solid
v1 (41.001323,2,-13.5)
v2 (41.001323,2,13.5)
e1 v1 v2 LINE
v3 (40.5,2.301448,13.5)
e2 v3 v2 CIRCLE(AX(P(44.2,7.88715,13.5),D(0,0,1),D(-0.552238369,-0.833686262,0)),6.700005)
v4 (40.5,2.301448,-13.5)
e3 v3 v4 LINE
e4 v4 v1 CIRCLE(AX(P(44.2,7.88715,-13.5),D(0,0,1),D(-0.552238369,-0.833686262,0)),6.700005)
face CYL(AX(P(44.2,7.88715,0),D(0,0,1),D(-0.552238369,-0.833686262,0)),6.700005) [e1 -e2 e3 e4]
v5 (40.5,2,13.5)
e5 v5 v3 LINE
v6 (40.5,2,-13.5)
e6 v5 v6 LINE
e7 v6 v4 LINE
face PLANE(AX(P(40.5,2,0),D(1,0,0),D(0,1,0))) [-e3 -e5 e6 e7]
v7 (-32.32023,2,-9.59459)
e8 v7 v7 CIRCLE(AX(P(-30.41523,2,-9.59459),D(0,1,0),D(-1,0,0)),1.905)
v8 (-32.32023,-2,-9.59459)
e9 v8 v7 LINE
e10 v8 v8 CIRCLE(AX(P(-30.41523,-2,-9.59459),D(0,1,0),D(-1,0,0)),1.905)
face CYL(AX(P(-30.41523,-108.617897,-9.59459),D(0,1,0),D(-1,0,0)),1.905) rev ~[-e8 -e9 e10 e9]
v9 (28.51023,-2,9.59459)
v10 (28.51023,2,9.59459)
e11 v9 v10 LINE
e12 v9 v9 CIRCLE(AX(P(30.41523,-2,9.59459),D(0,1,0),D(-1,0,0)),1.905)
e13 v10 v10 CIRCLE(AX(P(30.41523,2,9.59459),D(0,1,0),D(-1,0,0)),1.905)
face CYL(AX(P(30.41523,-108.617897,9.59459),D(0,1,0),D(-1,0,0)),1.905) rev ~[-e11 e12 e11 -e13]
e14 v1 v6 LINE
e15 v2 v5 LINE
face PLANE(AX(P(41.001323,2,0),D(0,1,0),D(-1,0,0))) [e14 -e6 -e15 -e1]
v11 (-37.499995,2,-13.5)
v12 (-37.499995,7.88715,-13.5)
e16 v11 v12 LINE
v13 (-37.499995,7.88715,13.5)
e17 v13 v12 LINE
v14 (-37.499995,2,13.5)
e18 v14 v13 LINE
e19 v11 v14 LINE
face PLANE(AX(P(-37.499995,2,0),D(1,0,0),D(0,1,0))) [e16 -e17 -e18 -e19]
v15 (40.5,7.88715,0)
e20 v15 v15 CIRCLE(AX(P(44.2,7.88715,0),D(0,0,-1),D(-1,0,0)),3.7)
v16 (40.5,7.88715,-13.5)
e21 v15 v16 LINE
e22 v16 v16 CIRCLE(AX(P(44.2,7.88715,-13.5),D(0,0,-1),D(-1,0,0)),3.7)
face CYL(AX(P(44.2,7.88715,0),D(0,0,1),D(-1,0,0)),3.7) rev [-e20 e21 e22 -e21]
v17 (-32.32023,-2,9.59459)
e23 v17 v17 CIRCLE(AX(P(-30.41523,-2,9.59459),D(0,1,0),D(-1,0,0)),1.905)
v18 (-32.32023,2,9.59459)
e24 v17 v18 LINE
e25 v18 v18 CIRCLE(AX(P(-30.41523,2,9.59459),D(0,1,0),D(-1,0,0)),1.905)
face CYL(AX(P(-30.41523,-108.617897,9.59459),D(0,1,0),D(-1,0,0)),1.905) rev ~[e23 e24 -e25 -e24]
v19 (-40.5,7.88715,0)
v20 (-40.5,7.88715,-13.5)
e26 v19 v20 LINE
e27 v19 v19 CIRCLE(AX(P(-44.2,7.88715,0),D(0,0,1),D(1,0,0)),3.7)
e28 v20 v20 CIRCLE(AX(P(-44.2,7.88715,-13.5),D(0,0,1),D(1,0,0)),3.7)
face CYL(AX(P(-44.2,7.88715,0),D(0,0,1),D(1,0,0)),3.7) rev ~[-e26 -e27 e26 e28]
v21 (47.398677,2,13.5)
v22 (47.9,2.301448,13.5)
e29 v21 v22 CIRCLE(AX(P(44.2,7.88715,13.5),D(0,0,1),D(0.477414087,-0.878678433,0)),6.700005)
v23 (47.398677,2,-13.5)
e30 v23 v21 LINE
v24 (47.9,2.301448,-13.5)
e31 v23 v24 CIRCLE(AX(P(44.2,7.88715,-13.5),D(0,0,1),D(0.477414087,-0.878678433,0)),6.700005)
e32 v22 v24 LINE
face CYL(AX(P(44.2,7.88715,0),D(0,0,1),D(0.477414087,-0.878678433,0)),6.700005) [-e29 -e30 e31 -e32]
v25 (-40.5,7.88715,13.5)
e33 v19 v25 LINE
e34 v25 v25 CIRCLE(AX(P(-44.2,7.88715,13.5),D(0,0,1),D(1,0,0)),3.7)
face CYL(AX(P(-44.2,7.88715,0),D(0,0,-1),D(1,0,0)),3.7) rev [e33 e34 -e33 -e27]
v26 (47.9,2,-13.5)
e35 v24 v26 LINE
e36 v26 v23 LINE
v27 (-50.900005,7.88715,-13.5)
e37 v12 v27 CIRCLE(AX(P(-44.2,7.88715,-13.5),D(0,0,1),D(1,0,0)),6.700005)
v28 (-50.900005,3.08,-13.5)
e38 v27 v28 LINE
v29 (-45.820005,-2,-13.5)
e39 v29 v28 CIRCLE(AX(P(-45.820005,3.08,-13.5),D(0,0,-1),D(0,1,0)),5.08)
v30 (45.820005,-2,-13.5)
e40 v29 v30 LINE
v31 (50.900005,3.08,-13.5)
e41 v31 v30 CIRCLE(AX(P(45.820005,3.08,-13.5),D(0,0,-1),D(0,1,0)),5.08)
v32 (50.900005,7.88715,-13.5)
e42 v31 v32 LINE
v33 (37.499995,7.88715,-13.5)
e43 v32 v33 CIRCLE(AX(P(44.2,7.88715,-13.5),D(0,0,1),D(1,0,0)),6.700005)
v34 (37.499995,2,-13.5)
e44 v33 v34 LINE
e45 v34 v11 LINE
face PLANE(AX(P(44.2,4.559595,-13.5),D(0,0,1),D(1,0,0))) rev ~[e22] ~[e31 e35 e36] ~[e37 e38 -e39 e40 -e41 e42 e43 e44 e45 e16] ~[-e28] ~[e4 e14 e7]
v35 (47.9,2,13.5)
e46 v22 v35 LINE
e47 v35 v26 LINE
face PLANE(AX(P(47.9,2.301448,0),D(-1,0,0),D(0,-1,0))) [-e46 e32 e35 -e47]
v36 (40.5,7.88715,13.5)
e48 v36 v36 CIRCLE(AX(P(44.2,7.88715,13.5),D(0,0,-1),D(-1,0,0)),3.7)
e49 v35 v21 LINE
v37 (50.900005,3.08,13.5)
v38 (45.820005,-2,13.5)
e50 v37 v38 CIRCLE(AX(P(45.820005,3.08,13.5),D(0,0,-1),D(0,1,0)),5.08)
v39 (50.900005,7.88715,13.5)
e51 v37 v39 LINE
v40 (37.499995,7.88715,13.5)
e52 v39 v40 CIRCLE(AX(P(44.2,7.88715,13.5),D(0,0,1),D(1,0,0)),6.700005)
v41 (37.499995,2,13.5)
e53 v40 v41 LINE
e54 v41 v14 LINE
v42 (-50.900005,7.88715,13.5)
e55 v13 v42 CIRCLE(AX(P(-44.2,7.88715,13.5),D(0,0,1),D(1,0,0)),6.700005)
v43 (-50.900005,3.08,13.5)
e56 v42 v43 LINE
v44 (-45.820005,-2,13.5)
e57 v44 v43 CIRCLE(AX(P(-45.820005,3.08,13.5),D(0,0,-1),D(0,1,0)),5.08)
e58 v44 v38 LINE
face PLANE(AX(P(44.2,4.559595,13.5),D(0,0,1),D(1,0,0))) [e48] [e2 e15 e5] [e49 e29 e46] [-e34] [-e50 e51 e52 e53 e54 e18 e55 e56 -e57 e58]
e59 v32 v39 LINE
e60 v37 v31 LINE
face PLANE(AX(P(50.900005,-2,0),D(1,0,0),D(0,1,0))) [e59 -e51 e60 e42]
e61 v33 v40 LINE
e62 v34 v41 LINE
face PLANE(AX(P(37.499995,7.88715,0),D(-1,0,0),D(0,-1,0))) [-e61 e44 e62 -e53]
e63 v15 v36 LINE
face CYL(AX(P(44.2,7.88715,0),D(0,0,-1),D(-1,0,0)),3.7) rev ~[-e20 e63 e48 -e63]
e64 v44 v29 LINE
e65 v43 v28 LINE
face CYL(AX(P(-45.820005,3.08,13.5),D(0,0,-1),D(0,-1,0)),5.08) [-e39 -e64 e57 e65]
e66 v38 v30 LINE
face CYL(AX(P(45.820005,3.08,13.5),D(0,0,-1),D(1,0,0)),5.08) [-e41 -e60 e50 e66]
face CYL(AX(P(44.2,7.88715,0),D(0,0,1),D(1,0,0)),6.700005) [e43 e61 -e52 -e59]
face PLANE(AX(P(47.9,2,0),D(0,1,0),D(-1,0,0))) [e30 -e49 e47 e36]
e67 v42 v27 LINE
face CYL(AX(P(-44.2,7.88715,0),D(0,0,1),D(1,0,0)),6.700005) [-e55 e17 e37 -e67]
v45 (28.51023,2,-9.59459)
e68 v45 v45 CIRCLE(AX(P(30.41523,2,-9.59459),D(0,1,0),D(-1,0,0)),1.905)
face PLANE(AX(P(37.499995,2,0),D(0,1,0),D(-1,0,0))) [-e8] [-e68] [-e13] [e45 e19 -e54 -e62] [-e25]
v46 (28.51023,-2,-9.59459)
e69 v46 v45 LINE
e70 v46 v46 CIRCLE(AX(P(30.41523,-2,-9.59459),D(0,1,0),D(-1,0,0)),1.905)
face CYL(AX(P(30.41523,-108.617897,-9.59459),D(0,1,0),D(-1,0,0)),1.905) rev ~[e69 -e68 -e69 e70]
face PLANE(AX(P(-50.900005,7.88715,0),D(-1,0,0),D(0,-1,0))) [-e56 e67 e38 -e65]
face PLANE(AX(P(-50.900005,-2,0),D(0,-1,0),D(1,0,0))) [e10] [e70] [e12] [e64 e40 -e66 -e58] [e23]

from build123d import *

# Parameters (mm, degrees)
F0_R     = 3.7
F1_DEPTH = 13.5
F2_R     = 5.08
F4_D     = 3.81


with BuildPart() as f1:
    # F0 (on Top) → F1 (new body, symmetric)
    with BuildSketch(Plane.XY):
        with BuildLine():
            Line((47.9, 2.3014477862), (47.9, 7.887150161))
            ThreePointArc((47.9, 7.887150161), (44.2, 4.187150161), (40.5, 7.887150161))
            Line((40.5, 7.887150161), (40.5, 2.3014477862))
            ThreePointArc((40.5, 2.3014477862), (40.7473700627, 2.1452499933), (41.0013230857, 2))
            Line((41.0013230857, 2), (47.3986769143, 2))
            ThreePointArc((47.3986769143, 2), (47.6526299373, 2.1452499933), (47.9, 2.3014477862))
        make_face()
        with BuildLine():
            ThreePointArc((40.5, 7.887150161), (44.2, 11.587150161), (47.9, 7.887150161))
            Line((47.9, 7.887150161), (47.9, 2.3014477862))
            ThreePointArc((47.9, 2.3014477862), (50.1025456639, 4.7169726099), (50.9000053, 7.887150161))
            ThreePointArc((50.9000053, 7.887150161), (44.2, 14.587155461), (37.4999947, 7.887150161))
            ThreePointArc((37.4999947, 7.887150161), (38.2974543361, 4.7169726099), (40.5, 2.3014477862))
            Line((40.5, 2.3014477862), (40.5, 7.887150161))
        make_face()
        with BuildLine():
            ThreePointArc((50.9000053, 7.887150161), (50.1025456639, 4.7169726099), (47.9, 2.3014477862))
            Line((47.9, 2.3014477862), (47.9, 2))
            Line((47.9, 2), (47.9, -2))
            Line((47.9, -2), (50.9000053, -2))
            Line((50.9000053, -2), (50.9000053, 7.887150161))
        make_face()
        with BuildLine():
            Line((40.5, 2), (40.5, 2.3014477862))
            ThreePointArc((40.5, 2.3014477862), (38.2974543361, 4.7169726099), (37.4999947, 7.887150161))
            Line((37.4999947, 7.887150161), (37.4999947, 2))
            Line((37.4999947, 2), (40.5, 2))
        make_face()
        with BuildLine():
            Line((47.9, -2), (47.9, 2))
            Line((47.9, 2), (47.3986769143, 2))
            ThreePointArc((47.3986769143, 2), (44.2, 1.187144861), (41.0013230857, 2))
            Line((41.0013230857, 2), (40.5, 2))
            Line((40.5, 2), (37.4999947, 2))
            Line((37.4999947, 2), (0, 2))
            Line((0, 2), (0, -2))
            Line((0, -2), (47.9, -2))
        make_face()
        with BuildLine():
            ThreePointArc((41.0013230857, 2), (44.2, 1.187144861), (47.3986769143, 2))
            Line((47.3986769143, 2), (41.0013230857, 2))
        make_face()
        with BuildLine():
            Line((-47.9, -2), (0, -2))
            Line((0, -2), (0, 2))
            Line((0, 2), (-37.4999947, 2))
            Line((-37.4999947, 2), (-41.0013230857, 2))
            ThreePointArc((-41.0013230857, 2), (-44.2, 1.187144861), (-47.3986769143, 2))
            ThreePointArc((-47.3986769143, 2), (-49.958525128, 4.4623203301), (-50.9000053, 7.887150161))
            Line((-50.9000053, 7.887150161), (-50.9000053, -2))
            Line((-50.9000053, -2), (-47.9, -2))
        make_face()
        with BuildLine():
            Line((-41.0013230857, 2), (-37.4999947, 2))
            Line((-37.4999947, 2), (-37.4999947, 7.887150161))
            ThreePointArc((-37.4999947, 7.887150161), (-38.441474872, 4.4623203301), (-41.0013230857, 2))
        make_face()
        with BuildLine():
            ThreePointArc((-47.3986769143, 2), (-44.2, 1.187144861), (-41.0013230857, 2))
            Line((-41.0013230857, 2), (-47.3986769143, 2))
        make_face()
        with BuildLine():
            Line((-47.3986769143, 2), (-41.0013230857, 2))
            ThreePointArc((-41.0013230857, 2), (-38.441474872, 4.4623203301), (-37.4999947, 7.887150161))
            ThreePointArc((-37.4999947, 7.887150161), (-44.2, 14.587155461), (-50.9000053, 7.887150161))
            ThreePointArc((-50.9000053, 7.887150161), (-49.958525128, 4.4623203301), (-47.3986769143, 2))
        make_face()
        with Locations((-44.2, 7.887150161)):
            Circle(F0_R, mode=Mode.SUBTRACT)
    extrude(amount=F1_DEPTH, both=True)

    # F2
    f2_edges = [f1.edges().sort_by_distance(p)[0] for p in [
        (50.900005, -2, 0),
        (-50.900005, -2, 0),
    ]]
    fillet(f2_edges, radius=F2_R)

    # F4 (through all)
    with Locations(Plane.XZ.offset(2)):
        with Locations((-30.41523, 9.59459), (-30.41523, -9.59459), (30.41523, -9.59459), (30.41523, 9.59459)):
            Hole(F4_D / 2)


solid = f1.part
